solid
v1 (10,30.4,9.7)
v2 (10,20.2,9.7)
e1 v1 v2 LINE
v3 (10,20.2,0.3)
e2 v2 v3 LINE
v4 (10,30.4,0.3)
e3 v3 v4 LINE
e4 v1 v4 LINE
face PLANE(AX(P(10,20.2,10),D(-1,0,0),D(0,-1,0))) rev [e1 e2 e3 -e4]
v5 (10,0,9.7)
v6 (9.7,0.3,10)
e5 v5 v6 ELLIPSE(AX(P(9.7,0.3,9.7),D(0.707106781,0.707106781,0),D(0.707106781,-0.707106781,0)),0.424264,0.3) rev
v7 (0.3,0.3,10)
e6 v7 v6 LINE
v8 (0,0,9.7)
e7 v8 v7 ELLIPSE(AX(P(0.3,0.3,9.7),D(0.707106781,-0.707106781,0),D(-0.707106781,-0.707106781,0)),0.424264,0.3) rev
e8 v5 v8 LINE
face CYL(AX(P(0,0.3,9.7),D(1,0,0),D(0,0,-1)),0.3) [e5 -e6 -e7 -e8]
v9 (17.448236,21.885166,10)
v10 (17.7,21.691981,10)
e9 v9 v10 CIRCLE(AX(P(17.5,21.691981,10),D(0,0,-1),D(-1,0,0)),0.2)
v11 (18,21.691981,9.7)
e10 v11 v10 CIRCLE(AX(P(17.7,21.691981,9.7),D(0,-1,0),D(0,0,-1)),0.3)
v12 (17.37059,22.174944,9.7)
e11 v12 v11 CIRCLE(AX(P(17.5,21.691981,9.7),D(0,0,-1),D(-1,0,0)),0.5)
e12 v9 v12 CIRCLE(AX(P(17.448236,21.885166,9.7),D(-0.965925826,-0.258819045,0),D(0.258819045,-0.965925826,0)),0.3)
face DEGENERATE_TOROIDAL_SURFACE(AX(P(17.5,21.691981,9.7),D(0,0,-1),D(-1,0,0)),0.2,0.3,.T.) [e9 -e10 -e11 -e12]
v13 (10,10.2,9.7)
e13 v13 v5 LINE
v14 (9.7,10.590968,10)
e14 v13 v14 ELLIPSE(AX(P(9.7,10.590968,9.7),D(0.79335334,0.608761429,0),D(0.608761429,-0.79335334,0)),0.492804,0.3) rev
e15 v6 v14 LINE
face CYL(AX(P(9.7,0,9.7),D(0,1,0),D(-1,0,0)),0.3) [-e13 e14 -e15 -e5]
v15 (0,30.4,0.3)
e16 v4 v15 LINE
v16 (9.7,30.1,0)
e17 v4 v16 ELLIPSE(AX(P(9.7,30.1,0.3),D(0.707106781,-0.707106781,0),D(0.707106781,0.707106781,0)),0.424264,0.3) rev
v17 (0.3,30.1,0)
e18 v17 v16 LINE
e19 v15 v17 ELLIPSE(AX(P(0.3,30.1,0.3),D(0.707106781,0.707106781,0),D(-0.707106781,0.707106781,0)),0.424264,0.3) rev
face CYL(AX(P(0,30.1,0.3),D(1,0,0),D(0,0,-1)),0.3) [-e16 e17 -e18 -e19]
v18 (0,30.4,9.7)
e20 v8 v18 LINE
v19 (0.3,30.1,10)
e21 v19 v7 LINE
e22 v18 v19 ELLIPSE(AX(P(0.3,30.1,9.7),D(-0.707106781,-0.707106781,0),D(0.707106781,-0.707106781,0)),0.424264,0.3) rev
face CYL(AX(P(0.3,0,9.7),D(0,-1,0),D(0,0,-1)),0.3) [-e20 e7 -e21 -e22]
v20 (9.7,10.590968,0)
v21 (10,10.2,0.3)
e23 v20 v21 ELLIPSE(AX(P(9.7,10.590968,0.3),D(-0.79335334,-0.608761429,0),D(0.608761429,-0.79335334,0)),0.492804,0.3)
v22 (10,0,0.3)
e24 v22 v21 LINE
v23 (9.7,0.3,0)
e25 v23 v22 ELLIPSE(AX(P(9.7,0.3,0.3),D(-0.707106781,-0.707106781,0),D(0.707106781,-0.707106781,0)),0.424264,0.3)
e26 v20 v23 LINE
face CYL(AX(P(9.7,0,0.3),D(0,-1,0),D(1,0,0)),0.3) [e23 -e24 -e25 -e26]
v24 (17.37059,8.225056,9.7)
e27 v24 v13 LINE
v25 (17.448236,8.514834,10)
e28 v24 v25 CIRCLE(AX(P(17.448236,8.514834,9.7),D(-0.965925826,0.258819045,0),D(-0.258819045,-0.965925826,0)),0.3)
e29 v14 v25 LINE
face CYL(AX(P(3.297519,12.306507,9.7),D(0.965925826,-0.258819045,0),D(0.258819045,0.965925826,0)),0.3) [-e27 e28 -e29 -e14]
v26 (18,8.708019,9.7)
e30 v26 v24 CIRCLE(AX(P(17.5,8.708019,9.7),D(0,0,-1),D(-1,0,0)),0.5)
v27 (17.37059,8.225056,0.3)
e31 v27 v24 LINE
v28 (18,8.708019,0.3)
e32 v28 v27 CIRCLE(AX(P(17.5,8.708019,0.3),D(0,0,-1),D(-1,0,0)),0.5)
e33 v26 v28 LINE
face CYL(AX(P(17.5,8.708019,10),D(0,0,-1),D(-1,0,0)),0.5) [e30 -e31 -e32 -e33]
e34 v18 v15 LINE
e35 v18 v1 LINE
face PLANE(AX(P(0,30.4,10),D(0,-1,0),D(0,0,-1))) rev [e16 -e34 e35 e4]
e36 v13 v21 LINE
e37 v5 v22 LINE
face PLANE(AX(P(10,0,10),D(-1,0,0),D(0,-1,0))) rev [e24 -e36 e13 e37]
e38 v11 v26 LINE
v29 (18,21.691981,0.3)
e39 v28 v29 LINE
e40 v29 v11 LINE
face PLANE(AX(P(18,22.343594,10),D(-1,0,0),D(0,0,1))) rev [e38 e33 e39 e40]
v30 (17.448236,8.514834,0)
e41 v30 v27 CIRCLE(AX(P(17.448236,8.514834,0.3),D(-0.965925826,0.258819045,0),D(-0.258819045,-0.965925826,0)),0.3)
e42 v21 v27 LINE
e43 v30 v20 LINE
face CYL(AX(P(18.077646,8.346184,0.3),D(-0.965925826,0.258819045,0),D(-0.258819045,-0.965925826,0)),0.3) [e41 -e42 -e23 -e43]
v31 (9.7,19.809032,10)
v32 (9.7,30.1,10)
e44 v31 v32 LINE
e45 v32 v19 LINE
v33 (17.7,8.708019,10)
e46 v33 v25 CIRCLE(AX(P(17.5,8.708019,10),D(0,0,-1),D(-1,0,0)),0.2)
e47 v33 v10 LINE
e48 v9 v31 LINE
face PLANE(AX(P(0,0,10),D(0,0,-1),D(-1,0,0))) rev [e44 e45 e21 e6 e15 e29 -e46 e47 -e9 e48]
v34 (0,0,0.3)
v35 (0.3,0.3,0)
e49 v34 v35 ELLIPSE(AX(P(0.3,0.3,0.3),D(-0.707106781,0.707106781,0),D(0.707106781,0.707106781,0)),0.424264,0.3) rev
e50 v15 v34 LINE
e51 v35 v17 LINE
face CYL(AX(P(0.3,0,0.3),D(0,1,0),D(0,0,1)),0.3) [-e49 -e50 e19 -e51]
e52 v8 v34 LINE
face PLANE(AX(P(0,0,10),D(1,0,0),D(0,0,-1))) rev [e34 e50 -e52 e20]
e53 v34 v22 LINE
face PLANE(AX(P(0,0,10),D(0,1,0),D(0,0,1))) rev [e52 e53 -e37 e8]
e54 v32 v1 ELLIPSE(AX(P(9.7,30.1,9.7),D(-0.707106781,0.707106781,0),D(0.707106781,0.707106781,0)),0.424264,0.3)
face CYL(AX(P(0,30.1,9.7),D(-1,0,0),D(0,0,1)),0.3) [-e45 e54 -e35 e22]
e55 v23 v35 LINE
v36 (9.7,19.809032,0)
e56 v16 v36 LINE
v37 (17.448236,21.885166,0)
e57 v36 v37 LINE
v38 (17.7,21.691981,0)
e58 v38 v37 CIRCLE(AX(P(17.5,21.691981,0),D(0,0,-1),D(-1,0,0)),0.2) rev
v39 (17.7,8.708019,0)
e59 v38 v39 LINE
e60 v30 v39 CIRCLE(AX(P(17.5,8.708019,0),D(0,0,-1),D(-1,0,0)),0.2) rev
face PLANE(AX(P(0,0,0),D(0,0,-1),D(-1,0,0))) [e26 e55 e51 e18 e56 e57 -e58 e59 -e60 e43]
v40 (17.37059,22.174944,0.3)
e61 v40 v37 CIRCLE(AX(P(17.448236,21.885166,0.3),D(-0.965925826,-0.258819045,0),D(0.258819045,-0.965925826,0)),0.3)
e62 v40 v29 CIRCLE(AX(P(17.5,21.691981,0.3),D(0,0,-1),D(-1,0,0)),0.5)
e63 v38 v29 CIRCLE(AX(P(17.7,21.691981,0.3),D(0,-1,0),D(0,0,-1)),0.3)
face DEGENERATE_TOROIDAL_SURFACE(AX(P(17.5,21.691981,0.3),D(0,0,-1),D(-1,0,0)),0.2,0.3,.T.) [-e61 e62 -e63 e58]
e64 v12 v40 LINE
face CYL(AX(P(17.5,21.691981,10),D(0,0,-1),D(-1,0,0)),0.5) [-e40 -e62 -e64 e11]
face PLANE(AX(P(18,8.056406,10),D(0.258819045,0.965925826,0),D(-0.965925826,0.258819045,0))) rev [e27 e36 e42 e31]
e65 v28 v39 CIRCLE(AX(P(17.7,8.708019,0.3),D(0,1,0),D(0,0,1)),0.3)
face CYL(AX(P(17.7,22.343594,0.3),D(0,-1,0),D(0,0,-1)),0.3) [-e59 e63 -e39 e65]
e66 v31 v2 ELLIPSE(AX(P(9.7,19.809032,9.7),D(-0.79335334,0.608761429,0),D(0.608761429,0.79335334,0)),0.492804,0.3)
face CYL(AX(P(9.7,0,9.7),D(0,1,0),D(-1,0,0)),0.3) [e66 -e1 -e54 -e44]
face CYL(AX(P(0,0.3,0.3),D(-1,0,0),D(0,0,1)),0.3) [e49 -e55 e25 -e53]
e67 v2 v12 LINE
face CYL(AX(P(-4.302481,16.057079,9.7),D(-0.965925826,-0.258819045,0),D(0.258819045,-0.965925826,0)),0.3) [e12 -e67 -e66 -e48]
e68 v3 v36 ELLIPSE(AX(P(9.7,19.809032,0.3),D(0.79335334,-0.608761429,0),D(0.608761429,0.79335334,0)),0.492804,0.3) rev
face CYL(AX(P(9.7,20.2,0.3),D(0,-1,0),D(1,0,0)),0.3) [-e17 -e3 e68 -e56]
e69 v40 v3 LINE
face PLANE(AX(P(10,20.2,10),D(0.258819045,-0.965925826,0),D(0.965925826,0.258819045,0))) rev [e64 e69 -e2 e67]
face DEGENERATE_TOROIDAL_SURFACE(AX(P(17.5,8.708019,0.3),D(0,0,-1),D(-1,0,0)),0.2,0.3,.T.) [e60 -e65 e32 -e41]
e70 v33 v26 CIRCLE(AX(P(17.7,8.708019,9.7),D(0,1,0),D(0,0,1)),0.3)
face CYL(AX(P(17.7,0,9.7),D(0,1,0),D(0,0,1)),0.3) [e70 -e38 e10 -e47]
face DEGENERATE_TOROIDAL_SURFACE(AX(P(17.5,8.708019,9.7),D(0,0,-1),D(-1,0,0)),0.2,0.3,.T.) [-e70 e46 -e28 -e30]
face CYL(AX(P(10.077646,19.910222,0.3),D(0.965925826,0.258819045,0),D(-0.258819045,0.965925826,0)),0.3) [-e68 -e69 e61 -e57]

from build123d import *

# Parameters (mm, degrees)
BOSS_EXTRU_1_DEPTH = 10
CONG_1_R           = 0.3
CONG_2_R           = 0.5


with BuildPart() as part:
    # Esquisse1 → Boss.-Extru.1 (new body)
    with BuildSketch(Plane.XY):
        Polygon((10, 20.2), (18, 22.343593539), (18, 8.056406461), (10, 10.2), (10, 0), (0, 0), (0, 30.4), (10, 30.4), align=None)
    extrude(amount=BOSS_EXTRU_1_DEPTH)

    # Congé1
    cong_1_edges = [part.edges().sort_by_distance(p)[0] for p in [
        (14, 9.12820323, 0),
        (10, 5.1, 0),
        (5, 0, 0),
        (0, 15.2, 0),
        (10, 5.1, 10),
        (14, 9.12820323, 10),
        (18, 15.2, 10),
        (14, 21.27179677, 10),
        (10, 25.3, 10),
        (5, 30.4, 10),
        (0, 15.2, 10),
        (5, 30.4, 0),
        (5, 0, 10),
        (10, 25.3, 0),
        (14, 21.27179677, 0),
        (18, 15.2, 0),
    ]]
    fillet(cong_1_edges, radius=CONG_1_R)

    # Congé2
    # the kernel refuses this fillet: 0.5 mm, written as the material it takes off along each edge
    with BuildSketch(Plane(origin=(17.5, 21.691980853, 0), x_dir=(-0.25881904510251885, 0.9659258262890689, 0), z_dir=(-0.9659258262890689, -0.25881904510251885, 0))) as cong_2_piece_1:
        with BuildLine():
            CenterArc((0.2, -0.3), 0.3, 0, 90)
            Line((0.5, -0.3), (0.5, 0))
            Line((0.5, 0), (0.2, 0))
        make_face()
    revolve(axis=Axis((17.5, 21.691980853, 0), (0, 0, -1)), revolution_arc=105, mode=Mode.SUBTRACT)
    with BuildSketch(Plane(origin=(17.5, 8.708019147, 0), x_dir=(1, 0, 0), z_dir=(0, 1, 0))) as cong_2_piece_2:
        with BuildLine():
            CenterArc((0.2, -0.3), 0.3, 0, 90)
            Line((0.5, -0.3), (0.5, 0))
            Line((0.5, 0), (0.2, 0))
        make_face()
    revolve(axis=Axis((17.5, 8.708019147, 0), (0, 0, -1)), revolution_arc=105, mode=Mode.SUBTRACT)
    with BuildSketch(Plane(origin=(17.5, 8.708019147, 10), x_dir=(-0.25881904510251746, -0.9659258262890692, 0), z_dir=(-0.9659258262890692, 0.25881904510251746, 0))) as cong_2_piece_3:
        with BuildLine():
            CenterArc((0.2, -0.3), 0.3, 0, 90)
            Line((0.5, -0.3), (0.5, 0))
            Line((0.5, 0), (0.2, 0))
        make_face()
    revolve(axis=Axis((17.5, 8.708019147, 10), (0, 0, 1)), revolution_arc=105, mode=Mode.SUBTRACT)
    with BuildSketch(Plane(origin=(17.5, 21.691980853, 10), x_dir=(1, 0, 0), z_dir=(0, -1, 0))) as cong_2_piece_4:
        with BuildLine():
            CenterArc((0.2, -0.3), 0.3, 0, 90)
            Line((0.5, -0.3), (0.5, 0))
            Line((0.5, 0), (0.2, 0))
        make_face()
    revolve(axis=Axis((17.5, 21.691980853, 10), (0, 0, 1)), revolution_arc=105, mode=Mode.SUBTRACT)
    with BuildSketch(Plane(origin=(18, 8.056406461, 0), x_dir=(0, 1, 0), z_dir=(0, 0, 1)), Plane(origin=(18, 22.343593539, 0), x_dir=(-0.9659258262890698, -0.2588190451025152, 0), z_dir=(0, 0, 1))) as cong_2_piece_5:
        with BuildLine():
            CenterArc((CONG_2_R * 1.30322537284, CONG_2_R), CONG_2_R, 165, 105)
            Line((CONG_2_R * 0.337299546552, CONG_2_R * 1.2588190451), (0, 0))
            Line((0, 0), (CONG_2_R * 1.30322537284, 0))
        make_face()
    extrude(amount=10, mode=Mode.SUBTRACT)


solid = part.part
